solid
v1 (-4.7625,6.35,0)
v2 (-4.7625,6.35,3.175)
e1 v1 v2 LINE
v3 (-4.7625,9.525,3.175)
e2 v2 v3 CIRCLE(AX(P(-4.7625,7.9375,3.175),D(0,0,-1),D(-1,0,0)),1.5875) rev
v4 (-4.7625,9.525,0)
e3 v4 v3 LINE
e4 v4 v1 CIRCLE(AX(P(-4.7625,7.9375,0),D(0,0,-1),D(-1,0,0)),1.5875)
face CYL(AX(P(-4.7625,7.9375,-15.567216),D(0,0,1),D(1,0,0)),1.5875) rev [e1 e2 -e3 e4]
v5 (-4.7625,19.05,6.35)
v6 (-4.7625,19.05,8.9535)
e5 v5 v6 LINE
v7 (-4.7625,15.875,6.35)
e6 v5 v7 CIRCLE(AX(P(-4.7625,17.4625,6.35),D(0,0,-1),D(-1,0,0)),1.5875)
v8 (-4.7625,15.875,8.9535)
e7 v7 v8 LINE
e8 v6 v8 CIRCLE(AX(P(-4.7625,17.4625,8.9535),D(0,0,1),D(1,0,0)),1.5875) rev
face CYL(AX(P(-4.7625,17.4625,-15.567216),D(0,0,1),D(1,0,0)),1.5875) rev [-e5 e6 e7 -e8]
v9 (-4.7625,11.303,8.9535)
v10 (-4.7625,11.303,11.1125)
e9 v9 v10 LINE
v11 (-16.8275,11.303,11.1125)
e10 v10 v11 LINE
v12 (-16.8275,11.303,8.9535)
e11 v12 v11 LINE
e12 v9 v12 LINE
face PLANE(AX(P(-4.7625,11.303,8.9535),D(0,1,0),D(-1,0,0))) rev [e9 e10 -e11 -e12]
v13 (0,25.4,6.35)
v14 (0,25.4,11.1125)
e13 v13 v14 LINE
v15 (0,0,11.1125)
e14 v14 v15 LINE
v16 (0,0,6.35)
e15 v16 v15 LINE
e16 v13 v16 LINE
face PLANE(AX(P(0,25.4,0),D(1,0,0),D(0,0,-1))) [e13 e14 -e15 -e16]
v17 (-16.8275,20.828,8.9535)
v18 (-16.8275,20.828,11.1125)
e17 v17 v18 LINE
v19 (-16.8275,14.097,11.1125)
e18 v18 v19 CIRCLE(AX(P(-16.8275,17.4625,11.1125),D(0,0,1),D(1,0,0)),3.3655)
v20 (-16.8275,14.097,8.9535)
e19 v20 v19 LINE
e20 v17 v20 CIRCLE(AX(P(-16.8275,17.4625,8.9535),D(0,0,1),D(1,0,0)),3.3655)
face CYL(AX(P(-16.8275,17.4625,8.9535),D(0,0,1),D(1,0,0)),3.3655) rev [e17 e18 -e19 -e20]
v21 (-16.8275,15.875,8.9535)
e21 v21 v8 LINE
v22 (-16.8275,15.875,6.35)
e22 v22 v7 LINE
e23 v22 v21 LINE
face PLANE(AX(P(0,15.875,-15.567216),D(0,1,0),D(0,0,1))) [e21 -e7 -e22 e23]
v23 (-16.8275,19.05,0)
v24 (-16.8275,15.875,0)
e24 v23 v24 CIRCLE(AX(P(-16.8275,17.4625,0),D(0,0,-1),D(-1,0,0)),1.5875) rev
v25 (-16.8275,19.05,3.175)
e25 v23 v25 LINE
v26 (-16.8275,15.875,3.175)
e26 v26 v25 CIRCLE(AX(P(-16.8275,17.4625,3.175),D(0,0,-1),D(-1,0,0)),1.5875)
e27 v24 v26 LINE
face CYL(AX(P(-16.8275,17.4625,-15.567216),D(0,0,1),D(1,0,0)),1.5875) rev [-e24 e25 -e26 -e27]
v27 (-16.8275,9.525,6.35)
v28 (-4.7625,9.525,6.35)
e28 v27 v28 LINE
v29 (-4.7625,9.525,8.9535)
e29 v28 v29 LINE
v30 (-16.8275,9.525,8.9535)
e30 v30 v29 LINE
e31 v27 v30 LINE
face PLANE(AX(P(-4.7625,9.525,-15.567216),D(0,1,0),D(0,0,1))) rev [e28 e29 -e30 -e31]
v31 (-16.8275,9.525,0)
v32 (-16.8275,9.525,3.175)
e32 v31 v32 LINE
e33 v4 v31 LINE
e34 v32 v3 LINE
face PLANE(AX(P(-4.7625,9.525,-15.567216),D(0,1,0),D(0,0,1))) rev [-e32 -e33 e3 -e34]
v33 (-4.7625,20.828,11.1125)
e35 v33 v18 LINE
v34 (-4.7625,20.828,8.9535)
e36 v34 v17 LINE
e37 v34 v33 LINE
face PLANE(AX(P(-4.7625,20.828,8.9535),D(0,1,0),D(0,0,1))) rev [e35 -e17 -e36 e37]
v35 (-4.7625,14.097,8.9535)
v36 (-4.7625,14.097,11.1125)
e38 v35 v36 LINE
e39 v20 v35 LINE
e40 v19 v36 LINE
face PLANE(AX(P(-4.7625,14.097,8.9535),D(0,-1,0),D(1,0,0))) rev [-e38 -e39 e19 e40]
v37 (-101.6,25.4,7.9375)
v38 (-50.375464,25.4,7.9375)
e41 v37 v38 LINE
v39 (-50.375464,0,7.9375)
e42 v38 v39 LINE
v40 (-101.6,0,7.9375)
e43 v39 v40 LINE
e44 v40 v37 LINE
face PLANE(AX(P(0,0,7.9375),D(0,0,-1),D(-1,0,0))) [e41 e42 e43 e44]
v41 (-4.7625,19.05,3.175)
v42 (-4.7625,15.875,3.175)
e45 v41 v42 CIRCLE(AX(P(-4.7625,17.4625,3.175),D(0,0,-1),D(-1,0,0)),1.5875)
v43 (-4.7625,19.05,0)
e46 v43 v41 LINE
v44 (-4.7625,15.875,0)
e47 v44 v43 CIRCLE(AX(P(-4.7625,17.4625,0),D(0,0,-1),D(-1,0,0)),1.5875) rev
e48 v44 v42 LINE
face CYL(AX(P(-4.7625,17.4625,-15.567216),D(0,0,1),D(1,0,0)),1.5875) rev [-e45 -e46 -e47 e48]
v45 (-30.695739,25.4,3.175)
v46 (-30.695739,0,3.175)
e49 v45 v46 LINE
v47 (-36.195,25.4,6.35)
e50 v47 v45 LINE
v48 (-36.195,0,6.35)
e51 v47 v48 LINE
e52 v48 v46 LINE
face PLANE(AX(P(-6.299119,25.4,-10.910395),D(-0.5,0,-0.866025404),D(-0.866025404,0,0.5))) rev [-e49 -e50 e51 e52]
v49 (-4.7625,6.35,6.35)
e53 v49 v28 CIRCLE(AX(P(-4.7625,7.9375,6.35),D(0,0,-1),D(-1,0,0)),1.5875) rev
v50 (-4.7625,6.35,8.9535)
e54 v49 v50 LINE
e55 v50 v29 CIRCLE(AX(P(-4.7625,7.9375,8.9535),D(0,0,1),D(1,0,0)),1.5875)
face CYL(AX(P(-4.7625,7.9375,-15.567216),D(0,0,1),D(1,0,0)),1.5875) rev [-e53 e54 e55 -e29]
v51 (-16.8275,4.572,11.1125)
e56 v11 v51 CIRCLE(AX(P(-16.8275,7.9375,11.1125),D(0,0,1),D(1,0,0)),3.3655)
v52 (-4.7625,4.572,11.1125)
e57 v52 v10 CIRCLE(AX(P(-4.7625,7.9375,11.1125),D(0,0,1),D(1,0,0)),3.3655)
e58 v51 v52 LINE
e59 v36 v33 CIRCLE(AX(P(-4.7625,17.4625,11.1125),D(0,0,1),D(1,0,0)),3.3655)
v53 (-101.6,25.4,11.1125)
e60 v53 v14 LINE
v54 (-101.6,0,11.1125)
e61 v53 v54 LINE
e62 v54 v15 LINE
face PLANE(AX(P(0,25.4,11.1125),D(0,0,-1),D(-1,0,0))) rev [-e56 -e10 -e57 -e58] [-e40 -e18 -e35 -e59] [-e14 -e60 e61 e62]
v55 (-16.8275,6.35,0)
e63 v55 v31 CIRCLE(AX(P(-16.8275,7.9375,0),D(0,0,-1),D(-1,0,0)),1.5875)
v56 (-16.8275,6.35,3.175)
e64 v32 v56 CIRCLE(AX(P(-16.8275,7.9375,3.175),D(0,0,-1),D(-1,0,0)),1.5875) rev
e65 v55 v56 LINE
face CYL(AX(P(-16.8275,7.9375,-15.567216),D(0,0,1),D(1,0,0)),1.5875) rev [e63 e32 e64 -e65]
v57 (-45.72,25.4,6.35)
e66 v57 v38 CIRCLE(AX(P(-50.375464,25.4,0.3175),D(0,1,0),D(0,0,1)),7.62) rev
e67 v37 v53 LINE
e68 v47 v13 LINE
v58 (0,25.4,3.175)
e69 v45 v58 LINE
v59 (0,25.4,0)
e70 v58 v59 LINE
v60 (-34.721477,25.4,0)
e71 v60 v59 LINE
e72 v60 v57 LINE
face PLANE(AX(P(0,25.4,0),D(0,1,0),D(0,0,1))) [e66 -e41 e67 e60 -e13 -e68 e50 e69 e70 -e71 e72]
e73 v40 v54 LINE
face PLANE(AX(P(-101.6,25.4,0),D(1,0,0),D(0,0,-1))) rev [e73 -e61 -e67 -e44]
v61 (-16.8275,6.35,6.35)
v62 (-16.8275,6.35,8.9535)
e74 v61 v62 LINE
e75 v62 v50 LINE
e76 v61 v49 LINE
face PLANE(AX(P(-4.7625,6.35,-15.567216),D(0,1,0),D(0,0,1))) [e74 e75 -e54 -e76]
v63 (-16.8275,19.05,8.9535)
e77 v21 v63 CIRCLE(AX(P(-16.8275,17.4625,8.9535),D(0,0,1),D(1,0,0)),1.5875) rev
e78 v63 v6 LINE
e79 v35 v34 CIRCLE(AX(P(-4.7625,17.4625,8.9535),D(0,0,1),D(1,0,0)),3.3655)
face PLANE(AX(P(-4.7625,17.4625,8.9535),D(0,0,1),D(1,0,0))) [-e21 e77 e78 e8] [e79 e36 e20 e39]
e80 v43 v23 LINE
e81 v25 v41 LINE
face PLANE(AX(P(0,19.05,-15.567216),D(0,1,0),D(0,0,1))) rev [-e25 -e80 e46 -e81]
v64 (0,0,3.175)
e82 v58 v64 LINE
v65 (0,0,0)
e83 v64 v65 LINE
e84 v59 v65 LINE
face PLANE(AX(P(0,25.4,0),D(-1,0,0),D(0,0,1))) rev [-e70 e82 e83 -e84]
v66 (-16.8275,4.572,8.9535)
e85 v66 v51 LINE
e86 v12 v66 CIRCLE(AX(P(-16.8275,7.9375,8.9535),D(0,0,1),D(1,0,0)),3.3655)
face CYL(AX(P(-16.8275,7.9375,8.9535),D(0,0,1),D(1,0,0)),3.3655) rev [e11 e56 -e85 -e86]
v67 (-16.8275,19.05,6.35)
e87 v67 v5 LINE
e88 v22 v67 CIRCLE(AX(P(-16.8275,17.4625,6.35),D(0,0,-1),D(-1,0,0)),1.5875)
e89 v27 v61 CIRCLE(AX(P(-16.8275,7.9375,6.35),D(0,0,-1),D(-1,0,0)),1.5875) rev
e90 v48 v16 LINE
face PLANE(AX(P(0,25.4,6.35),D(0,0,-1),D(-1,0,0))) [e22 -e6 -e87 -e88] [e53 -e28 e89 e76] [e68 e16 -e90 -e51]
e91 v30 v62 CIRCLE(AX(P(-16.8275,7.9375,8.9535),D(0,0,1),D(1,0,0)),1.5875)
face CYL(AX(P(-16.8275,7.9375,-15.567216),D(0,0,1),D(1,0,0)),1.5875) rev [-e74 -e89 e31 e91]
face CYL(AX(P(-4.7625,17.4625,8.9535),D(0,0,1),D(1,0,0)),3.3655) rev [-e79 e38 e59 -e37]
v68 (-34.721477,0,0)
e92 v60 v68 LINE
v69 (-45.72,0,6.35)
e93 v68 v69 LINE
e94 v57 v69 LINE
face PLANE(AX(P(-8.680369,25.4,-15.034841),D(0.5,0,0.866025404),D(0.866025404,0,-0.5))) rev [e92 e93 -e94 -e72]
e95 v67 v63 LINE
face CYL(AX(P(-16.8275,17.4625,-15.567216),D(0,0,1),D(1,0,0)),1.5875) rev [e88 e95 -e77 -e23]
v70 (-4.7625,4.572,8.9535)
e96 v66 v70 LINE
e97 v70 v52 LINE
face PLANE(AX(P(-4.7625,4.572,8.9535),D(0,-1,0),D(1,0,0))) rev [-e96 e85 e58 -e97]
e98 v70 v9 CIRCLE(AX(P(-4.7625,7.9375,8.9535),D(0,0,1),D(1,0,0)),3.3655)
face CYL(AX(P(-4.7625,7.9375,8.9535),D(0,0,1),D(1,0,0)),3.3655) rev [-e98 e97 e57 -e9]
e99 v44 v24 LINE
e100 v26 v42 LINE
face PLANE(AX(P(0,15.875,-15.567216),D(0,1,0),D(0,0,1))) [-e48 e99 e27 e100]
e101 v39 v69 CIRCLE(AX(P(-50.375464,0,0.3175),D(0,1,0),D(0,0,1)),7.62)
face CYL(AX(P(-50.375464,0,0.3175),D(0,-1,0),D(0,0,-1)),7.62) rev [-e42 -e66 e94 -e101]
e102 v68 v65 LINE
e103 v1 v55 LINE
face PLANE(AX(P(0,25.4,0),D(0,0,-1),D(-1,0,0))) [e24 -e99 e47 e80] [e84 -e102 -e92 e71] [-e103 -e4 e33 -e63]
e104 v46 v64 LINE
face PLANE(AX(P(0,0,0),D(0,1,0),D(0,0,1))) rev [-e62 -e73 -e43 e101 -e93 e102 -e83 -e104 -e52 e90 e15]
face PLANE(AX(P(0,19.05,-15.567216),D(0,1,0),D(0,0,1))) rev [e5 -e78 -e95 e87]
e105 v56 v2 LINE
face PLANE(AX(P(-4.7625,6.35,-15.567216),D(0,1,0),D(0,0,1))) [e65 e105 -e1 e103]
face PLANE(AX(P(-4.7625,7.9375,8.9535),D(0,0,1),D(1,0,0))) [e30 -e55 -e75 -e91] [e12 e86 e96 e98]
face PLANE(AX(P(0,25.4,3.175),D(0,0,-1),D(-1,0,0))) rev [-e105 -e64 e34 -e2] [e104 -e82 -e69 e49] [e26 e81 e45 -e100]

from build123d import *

# Parameters (mm, degrees)
BOSS_EXTRUDE1_DEPTH = 25.4
SKETCH3_W           = 55.88
SKETCH3_H           = 25.4
CUT_EXTRUDE1_DEPTH  = 1.5875
FILLET1_R           = 7.62
CUT_EXTRUDE2_REACH  = 107.315
CUT_EXTRUDE3_DEPTH  = 2.159


with BuildPart() as part:
    # Sketch1 → Boss-Extrude1 (new body)
    with BuildSketch(Plane(origin=(0, 0, 0), x_dir=(1, 0, 0), z_dir=(0, 1, 0))):
        Polygon((-22.587652327, -6.35), (-36.195, -6.35), (-30.695738686, -3.175), (-15.498938433, -3.175), (0, -3.175), (0, 0), (-34.721477372, 0), (-45.72, -6.35), (-101.6, -6.35), (-101.6, -11.1125), (0, -11.1125), (0, -6.35), (-15.498938433, -6.35), align=None)
    extrude(amount=BOSS_EXTRUDE1_DEPTH)

    # Sketch3 → Cut-Extrude1 (cut)
    with BuildSketch(Plane(origin=(0, 0, 6.35), x_dir=(-1, 0, 0), z_dir=(0, 0, -1))):
        with Locations((73.66, 12.7)):
            Rectangle(SKETCH3_W, SKETCH3_H)
    extrude(amount=-CUT_EXTRUDE1_DEPTH, mode=Mode.SUBTRACT)

    # Fillet1
    # the kernel refuses this fillet: 7.62 mm, written as the material it adds along each edge
    with BuildSketch(Plane(origin=(-45.72, 0, 7.9375), x_dir=(-1, 0, 0), z_dir=(0, 1, 0))) as fillet1_piece_1:
        with BuildLine():
            CenterArc((4.65546386, -7.62), FILLET1_R, 90, 37.658462006)
            Line((0, -1.5875), (-0.093109277, -1.46685))
            ThreePointArc((-0.093109277, -1.46685), (-0.1524, -0.79375), (-0.1524, 0))
            Line((-0.1524, 0), (0, 0.1524))
            Line((0, 0.1524), (4.65546386, 0.1524))
            Line((4.65546386, 0.1524), (4.65546386, 0))
        make_face()
    extrude(amount=25.4)

    # Cut-Extrude2: up to this face of the body (flat: up to its plane)
    cut_extrude2_end = Plane(part.part.faces().sort_by_distance((-17.360738686, 12.7, 0))[0])
    # Sketch4 → Cut-Extrude2 (cut, up to the picked face)
    with BuildSketch(Plane.XY.offset(11.1125), mode=Mode.PRIVATE) as cut_extrude2_sk1:
        with BuildLine():
            Line((-4.7625, 19.05), (-16.8275, 19.05))
            ThreePointArc((-16.8275, 19.05), (-18.415, 17.4625), (-16.8275, 15.875))
            Line((-16.8275, 15.875), (-4.7625, 15.875))
            ThreePointArc((-4.7625, 15.875), (-3.175, 17.4625), (-4.7625, 19.05))
        make_face()
    cut_extrude2_tool1 = split(extrude(cut_extrude2_sk1.sketch, amount=-CUT_EXTRUDE2_REACH, mode=Mode.PRIVATE), bisect_by=cut_extrude2_end, keep=Keep.BOTH, mode=Mode.PRIVATE)
    # Sketch4 → Cut-Extrude2 (cut, up to the picked face)
    with BuildSketch(Plane.XY.offset(11.1125), mode=Mode.PRIVATE) as cut_extrude2_sk2:
        with BuildLine():
            Line((-4.7625, 6.35), (-16.8275, 6.35))
            ThreePointArc((-16.8275, 6.35), (-18.415, 7.9375), (-16.8275, 9.525))
            Line((-16.8275, 9.525), (-4.7625, 9.525))
            ThreePointArc((-4.7625, 9.525), (-3.175, 7.9375), (-4.7625, 6.35))
        make_face()
    cut_extrude2_tool2 = split(extrude(cut_extrude2_sk2.sketch, amount=-CUT_EXTRUDE2_REACH, mode=Mode.PRIVATE), bisect_by=cut_extrude2_end, keep=Keep.BOTH, mode=Mode.PRIVATE)
    add(cut_extrude2_tool1.solids().sort_by(Axis((-10.795, 17.4625, 11.1125), (0, 0, -1)))[0], mode=Mode.SUBTRACT)
    add(cut_extrude2_tool2.solids().sort_by(Axis((-10.795, 7.9375, 11.1125), (0, 0, -1)))[0], mode=Mode.SUBTRACT)

    # Sketch5 → Cut-Extrude3 (cut)
    with BuildSketch(Plane.XY.offset(11.1125)):
        with BuildLine():
            Line((-4.7625, 4.572), (-16.8275, 4.572))
            ThreePointArc((-16.8275, 4.572), (-20.193, 7.9375), (-16.8275, 11.303))
            Line((-16.8275, 11.303), (-4.7625, 11.303))
            ThreePointArc((-4.7625, 11.303), (-1.397, 7.9375), (-4.7625, 4.572))
        make_face()
        with BuildLine():
            Line((-4.7625, 14.097), (-16.8275, 14.097))
            ThreePointArc((-16.8275, 14.097), (-20.193, 17.4625), (-16.8275, 20.828))
            Line((-16.8275, 20.828), (-4.7625, 20.828))
            ThreePointArc((-4.7625, 20.828), (-1.397, 17.4625), (-4.7625, 14.097))
        make_face()
    extrude(amount=-CUT_EXTRUDE3_DEPTH, mode=Mode.SUBTRACT)


solid = part.part
